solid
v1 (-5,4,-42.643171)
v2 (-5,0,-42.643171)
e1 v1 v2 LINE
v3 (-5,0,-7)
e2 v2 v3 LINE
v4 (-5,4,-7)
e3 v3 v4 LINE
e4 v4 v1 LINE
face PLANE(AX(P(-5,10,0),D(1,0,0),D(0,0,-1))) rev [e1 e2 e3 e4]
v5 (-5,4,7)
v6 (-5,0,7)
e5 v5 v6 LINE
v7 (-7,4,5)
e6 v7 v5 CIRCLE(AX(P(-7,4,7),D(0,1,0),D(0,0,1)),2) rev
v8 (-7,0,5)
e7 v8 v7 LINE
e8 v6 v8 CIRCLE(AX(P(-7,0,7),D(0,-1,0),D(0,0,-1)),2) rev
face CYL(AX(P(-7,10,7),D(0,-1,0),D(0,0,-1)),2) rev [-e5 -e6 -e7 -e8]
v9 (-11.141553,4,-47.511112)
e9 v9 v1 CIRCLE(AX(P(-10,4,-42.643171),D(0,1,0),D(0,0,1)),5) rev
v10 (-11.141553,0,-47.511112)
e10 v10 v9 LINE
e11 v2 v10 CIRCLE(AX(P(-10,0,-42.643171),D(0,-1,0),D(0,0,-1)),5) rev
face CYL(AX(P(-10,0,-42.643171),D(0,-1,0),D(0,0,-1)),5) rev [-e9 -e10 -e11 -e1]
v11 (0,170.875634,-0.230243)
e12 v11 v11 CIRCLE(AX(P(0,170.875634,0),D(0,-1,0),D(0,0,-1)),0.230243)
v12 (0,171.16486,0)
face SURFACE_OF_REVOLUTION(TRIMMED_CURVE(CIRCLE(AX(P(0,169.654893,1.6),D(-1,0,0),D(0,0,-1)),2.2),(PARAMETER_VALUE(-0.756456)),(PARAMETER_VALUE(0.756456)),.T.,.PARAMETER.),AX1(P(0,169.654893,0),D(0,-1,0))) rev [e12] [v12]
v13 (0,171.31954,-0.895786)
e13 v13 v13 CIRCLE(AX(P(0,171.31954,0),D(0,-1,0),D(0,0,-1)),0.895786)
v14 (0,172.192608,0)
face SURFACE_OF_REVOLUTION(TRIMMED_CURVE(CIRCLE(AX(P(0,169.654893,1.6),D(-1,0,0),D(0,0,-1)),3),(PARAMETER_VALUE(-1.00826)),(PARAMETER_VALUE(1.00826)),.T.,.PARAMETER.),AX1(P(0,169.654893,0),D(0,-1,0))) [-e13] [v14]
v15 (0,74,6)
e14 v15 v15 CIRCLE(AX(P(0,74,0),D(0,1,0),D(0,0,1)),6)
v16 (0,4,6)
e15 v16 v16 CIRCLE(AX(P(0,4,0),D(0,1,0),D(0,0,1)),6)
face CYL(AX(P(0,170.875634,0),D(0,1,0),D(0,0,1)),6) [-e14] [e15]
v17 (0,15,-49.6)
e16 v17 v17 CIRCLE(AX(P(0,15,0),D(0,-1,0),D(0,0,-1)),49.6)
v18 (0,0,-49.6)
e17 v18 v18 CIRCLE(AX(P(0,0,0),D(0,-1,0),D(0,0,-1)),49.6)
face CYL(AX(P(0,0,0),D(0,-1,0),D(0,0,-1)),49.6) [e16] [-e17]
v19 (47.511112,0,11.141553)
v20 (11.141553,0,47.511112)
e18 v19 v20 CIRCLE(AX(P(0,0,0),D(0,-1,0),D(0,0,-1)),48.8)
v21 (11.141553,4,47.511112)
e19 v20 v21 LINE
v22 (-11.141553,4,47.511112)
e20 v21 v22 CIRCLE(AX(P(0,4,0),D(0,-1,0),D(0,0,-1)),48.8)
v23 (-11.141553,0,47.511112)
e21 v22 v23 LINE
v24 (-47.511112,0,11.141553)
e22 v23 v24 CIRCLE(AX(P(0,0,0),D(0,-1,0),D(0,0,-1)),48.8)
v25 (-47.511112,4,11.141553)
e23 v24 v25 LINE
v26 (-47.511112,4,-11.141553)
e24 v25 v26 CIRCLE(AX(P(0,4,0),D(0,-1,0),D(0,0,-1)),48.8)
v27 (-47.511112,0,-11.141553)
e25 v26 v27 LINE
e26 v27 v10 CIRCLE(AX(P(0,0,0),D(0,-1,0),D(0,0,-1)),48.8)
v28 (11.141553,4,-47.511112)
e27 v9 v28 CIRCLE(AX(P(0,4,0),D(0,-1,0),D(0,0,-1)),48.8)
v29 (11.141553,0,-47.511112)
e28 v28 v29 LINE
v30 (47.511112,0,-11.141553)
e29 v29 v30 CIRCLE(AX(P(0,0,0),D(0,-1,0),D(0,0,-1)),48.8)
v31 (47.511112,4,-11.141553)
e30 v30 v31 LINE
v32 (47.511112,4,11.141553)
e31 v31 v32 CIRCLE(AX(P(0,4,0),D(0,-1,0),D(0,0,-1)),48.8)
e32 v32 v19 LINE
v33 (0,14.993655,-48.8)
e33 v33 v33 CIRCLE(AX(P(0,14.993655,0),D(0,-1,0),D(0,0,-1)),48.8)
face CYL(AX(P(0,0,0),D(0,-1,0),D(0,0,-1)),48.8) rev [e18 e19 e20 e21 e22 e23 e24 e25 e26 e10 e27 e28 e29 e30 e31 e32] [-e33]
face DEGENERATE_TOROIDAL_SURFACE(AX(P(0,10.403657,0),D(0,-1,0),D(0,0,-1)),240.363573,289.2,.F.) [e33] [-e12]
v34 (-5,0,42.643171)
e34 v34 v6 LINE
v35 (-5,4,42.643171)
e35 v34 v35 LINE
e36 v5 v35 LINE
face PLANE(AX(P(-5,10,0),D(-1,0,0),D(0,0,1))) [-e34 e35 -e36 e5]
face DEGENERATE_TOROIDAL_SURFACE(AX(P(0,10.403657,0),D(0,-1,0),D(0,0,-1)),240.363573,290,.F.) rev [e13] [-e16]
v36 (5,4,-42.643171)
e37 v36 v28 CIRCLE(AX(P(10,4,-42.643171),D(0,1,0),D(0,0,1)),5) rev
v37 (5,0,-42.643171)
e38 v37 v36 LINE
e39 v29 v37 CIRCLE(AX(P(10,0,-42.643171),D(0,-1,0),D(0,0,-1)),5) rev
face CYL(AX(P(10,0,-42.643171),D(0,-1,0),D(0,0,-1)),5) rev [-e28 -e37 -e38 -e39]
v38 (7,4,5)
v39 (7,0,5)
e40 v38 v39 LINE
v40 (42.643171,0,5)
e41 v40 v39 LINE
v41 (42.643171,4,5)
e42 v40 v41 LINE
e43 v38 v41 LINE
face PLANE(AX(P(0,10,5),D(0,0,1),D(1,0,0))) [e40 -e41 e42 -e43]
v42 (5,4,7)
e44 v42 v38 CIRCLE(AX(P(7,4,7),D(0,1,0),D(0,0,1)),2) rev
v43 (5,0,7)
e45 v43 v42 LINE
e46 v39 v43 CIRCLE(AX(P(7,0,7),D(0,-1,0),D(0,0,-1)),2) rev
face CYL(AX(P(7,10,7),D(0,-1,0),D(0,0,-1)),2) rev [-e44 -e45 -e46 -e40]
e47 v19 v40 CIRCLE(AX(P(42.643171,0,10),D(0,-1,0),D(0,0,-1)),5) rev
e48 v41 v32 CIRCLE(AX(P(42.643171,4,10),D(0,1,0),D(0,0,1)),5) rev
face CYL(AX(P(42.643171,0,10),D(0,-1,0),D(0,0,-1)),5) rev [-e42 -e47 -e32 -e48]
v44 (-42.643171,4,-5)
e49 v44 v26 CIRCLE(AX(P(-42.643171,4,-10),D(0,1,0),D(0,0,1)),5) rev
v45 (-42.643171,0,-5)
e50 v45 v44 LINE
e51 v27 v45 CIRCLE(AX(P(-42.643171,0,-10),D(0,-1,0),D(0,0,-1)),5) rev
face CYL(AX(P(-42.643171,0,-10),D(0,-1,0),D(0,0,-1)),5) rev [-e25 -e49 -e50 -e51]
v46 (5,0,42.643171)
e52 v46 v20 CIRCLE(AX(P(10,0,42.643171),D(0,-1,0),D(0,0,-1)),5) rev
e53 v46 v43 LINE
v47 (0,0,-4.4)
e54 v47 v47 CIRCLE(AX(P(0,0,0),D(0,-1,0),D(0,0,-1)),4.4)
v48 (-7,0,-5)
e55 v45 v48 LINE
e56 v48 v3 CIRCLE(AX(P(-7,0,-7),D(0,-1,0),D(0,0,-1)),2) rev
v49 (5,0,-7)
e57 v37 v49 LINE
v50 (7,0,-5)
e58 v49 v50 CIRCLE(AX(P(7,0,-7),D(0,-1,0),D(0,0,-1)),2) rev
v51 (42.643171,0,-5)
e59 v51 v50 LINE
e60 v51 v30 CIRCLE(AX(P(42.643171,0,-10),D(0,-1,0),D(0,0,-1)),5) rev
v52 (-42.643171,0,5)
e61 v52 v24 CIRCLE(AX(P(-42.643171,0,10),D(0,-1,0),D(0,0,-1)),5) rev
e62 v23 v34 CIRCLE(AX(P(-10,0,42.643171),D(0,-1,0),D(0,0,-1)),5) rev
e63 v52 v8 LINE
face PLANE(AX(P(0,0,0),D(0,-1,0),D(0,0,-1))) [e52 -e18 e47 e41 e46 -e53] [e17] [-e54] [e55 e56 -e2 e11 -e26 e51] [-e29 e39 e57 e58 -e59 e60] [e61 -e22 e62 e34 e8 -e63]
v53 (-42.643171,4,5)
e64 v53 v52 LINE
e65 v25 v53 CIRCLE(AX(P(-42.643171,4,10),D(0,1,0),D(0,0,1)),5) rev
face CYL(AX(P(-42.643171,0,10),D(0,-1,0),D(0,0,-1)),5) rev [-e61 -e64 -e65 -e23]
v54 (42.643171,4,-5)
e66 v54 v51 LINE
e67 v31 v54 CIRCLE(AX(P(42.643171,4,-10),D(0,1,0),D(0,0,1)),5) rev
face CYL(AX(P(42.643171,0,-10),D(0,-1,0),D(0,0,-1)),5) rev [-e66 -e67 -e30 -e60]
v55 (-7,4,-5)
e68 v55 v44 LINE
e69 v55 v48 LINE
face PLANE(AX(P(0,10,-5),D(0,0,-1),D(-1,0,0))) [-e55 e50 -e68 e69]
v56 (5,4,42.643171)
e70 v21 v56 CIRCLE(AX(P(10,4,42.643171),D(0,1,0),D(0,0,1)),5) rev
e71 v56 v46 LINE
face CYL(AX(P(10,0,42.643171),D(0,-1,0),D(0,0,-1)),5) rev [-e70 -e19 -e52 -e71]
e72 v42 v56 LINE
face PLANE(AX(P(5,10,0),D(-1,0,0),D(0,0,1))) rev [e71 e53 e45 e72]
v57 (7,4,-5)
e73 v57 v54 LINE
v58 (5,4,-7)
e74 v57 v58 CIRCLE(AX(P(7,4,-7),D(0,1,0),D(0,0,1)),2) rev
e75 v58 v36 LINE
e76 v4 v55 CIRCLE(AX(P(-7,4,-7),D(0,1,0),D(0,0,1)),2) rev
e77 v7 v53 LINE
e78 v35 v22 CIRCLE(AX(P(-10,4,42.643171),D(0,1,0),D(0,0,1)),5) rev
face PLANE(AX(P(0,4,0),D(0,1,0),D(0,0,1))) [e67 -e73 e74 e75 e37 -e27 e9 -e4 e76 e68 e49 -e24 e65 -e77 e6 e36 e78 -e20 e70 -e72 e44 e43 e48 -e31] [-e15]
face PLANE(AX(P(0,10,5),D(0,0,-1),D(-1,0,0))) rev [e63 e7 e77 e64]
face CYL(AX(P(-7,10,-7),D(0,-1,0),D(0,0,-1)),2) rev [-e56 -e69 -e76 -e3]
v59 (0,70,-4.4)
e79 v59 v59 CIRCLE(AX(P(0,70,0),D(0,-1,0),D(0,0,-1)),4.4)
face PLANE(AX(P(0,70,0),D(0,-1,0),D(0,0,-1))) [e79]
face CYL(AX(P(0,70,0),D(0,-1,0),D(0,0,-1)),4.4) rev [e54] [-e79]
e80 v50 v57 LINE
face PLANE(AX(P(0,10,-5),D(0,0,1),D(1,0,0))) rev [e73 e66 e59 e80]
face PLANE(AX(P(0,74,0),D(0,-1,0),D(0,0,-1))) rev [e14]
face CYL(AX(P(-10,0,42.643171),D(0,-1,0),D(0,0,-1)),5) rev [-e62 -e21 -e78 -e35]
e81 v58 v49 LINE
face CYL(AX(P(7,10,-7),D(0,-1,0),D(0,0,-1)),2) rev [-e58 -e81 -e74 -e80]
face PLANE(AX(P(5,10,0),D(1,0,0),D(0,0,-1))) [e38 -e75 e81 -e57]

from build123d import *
from build123d.topology import SkipClean

# Parameters (mm, degrees)
SKETCH_3_W          = 6
SKETCH_3_H          = 70
SKETCH_2_R          = 4.4
CUT_EXTRUDE_1_DEPTH = 70
CUT_EXTRUDE_2_DEPTH = 10
FILLET_2_R          = 5
FILLET_3_DEPTH      = 4


with BuildPart() as part:
    # Эскиз1 → Повернуть2 (revolve)
    with BuildSketch(Plane.XY, mode=Mode.PRIVATE) as revolve_2_sk:
        with BuildLine():
            Line((0, 0), (49.6, 0))
            Line((49.6, 0), (49.6, 15))
            ThreePointArc((49.6, 15), (36.508962008, 96.668362047), (0.895786477, 171.319539959))
            ThreePointArc((0.895786477, 171.319539959), (0.493902777, 171.803280928), (0, 172.192608398))
            Line((0, 172.192608398), (0, 171.164859777))
            ThreePointArc((0, 171.164859777), (0.121207527, 171.025091653), (0.230243416, 170.875634074))
            ThreePointArc((0.230243416, 170.875634074), (35.74423335, 96.433414941), (48.8, 14.993655439))
            Line((48.8, 14.993655439), (48.8, 4))
            Line((48.8, 4), (0, 4))
            Line((0, 4), (0, 0))
        make_face()
    revolve(revolve_2_sk.sketch.rotate(Axis((0, 0, 0), (0, 1, 0)), 90), axis=Axis((0, 0, 0), (0, 1, 0)))

    # Эскиз3 → Повернуть6 (revolve)
    with BuildSketch(Plane.XY, mode=Mode.PRIVATE) as revolve_6_sk:
        with Locations((3, 39)):
            Rectangle(SKETCH_3_W, SKETCH_3_H)
    revolve(revolve_6_sk.sketch.rotate(Axis((0, 170.875634074, 0), (0, -1, 0)), 270), axis=Axis((0, 170.875634074, 0), (0, -1, 0)))

    # Эскиз2 → Вырез-Вытянуть1 (cut)
    with BuildSketch(Plane.XZ):
        with Locations(Location((0, 0, 0), (0, 0, 270))):
            Circle(SKETCH_2_R)
    extrude(amount=-CUT_EXTRUDE_1_DEPTH, mode=Mode.SUBTRACT)

    # Эскиз4 → Вырез-Вытянуть2 (cut)
    with BuildSketch(Plane.XZ):
        with BuildLine():
            ThreePointArc((48.543176657, 5), (34.506810922, 34.506810922), (5, 48.543176657))
            Line((5, 48.543176657), (5, 5))
            Line((5, 5), (48.543176657, 5))
        make_face()
        with BuildLine():
            Line((-5, 5), (-5, 48.543176657))
            ThreePointArc((-5, 48.543176657), (-34.506810922, 34.506810922), (-48.543176657, 5))
            Line((-48.543176657, 5), (-5, 5))
        make_face()
        with BuildLine():
            ThreePointArc((5, -48.543176657), (34.506810922, -34.506810922), (48.543176657, -5))
            Line((48.543176657, -5), (5, -5))
            Line((5, -5), (5, -48.543176657))
        make_face()
        with BuildLine():
            Line((-5, -5), (-48.543176657, -5))
            ThreePointArc((-48.543176657, -5), (-34.506810922, -34.506810922), (-5, -48.543176657))
            Line((-5, -48.543176657), (-5, -5))
        make_face()
    extrude(amount=-CUT_EXTRUDE_2_DEPTH, mode=Mode.SUBTRACT)

    # Скругление2
    # the kernel refuses this fillet: 5 mm, written as the material it adds along each edge
    with BuildSketch(Plane(origin=(48.543176657, 0, 5), x_dir=(-0.16572247027257606, 0, 0.9861724305854199), z_dir=(0, 1, 0)), Plane(origin=(5, 0, -48.543176657), x_dir=(0.9861724305854203, 0, 0.16572247027257497), z_dir=(0, 1, 0))) as fillet_2_piece_1:
        with BuildLine():
            CenterArc((5.908625729, -4.989810949), FILLET_2_R, 86.34158246, 103.197624337)
            Line((0.977763576, -5.818423301), (0, 0))
            ThreePointArc((0, 0), (3.113832998, 0.099445136), (6.227665995, 0))
        make_face()
    extrude(amount=4)
    with BuildSketch(Plane(origin=(5, 0, 48.543176657), x_dir=(0.9861724305854201, 0, -0.1657224702725758), z_dir=(0, 1, 0)), Plane(origin=(48.543176657, 0, -5), x_dir=(-0.16572247027257642, 0, -0.98617243058542), z_dir=(0, 1, 0))) as fillet_2_piece_2:
        with BuildLine():
            CenterArc((5.908625729, 4.989810949), FILLET_2_R, 170.460793203, 103.197624337)
            Line((0.977763576, 5.818423301), (0, 0))
            ThreePointArc((0, 0), (3.113832998, -0.099445136), (6.227665995, 0))
        make_face()
    extrude(amount=4)
    with BuildSketch(Plane(origin=(-48.543176657, 0, -5), x_dir=(1, 0, 0), z_dir=(0, 1, 0)), Plane(origin=(-5, 0, 48.543176657), x_dir=(0, 0, -1), z_dir=(0, 1, 0))) as fillet_2_piece_3:
        with BuildLine():
            CenterArc((5.900006044, 5), FILLET_2_R, 166.802375663, 103.197624337)
            ThreePointArc((1.032064193, 6.141552511), (0.417962045, 3.087256549), (0, 0))
            Line((0, 0), (5.900006044, 0))
        make_face()
    extrude(amount=4)
    with BuildSketch(Plane(origin=(-5, 0, -48.543176657), x_dir=(0, 0, 1), z_dir=(0, 1, 0)), Plane(origin=(-48.543176657, 0, 5), x_dir=(1, 0, 0), z_dir=(0, 1, 0))) as fillet_2_piece_4:
        with BuildLine():
            CenterArc((5.900006044, -5), FILLET_2_R, 90, 103.197624337)
            ThreePointArc((1.032064193, -6.141552511), (0.417962045, -3.087256549), (0, 0))
            Line((0, 0), (5.900006044, 0))
        make_face()
    extrude(amount=4)

    # Скругление3: read off the stored shape, not the designer's step
    # Скругление3 outline → Скругление3 (add)
    with SkipClean():  # the faces are left unmerged after this step: merging them gives an invalid solid
        with BuildSketch(Plane(origin=(0, 0, 0), x_dir=(1, 0, 0), z_dir=(0, 1, 0))):
            with BuildLine():
                Line((5, 5), (7, 5))
                ThreePointArc((7, 5), (5.585786438, 5.585786438), (5, 7))
                Line((5, 7), (5, 5))
            make_face()
            with BuildLine():
                Line((5, -5), (5, -7))
                ThreePointArc((5, -7), (5.585786438, -5.585786438), (7, -5))
                Line((7, -5), (5, -5))
            make_face()
            with BuildLine():
                Line((-5, 5), (-5, 7))
                ThreePointArc((-5, 7), (-5.585786438, 5.585786438), (-7, 5))
                Line((-7, 5), (-5, 5))
            make_face()
            with BuildLine():
                Line((-5, -5), (-7, -5))
                ThreePointArc((-7, -5), (-5.585786438, -5.585786438), (-5, -7))
                Line((-5, -7), (-5, -5))
            make_face()
        extrude(amount=FILLET_3_DEPTH)
    add(part.part.scale(1), mode=Mode.REPLACE)  # the faces are merged on a copy


solid = part.part
